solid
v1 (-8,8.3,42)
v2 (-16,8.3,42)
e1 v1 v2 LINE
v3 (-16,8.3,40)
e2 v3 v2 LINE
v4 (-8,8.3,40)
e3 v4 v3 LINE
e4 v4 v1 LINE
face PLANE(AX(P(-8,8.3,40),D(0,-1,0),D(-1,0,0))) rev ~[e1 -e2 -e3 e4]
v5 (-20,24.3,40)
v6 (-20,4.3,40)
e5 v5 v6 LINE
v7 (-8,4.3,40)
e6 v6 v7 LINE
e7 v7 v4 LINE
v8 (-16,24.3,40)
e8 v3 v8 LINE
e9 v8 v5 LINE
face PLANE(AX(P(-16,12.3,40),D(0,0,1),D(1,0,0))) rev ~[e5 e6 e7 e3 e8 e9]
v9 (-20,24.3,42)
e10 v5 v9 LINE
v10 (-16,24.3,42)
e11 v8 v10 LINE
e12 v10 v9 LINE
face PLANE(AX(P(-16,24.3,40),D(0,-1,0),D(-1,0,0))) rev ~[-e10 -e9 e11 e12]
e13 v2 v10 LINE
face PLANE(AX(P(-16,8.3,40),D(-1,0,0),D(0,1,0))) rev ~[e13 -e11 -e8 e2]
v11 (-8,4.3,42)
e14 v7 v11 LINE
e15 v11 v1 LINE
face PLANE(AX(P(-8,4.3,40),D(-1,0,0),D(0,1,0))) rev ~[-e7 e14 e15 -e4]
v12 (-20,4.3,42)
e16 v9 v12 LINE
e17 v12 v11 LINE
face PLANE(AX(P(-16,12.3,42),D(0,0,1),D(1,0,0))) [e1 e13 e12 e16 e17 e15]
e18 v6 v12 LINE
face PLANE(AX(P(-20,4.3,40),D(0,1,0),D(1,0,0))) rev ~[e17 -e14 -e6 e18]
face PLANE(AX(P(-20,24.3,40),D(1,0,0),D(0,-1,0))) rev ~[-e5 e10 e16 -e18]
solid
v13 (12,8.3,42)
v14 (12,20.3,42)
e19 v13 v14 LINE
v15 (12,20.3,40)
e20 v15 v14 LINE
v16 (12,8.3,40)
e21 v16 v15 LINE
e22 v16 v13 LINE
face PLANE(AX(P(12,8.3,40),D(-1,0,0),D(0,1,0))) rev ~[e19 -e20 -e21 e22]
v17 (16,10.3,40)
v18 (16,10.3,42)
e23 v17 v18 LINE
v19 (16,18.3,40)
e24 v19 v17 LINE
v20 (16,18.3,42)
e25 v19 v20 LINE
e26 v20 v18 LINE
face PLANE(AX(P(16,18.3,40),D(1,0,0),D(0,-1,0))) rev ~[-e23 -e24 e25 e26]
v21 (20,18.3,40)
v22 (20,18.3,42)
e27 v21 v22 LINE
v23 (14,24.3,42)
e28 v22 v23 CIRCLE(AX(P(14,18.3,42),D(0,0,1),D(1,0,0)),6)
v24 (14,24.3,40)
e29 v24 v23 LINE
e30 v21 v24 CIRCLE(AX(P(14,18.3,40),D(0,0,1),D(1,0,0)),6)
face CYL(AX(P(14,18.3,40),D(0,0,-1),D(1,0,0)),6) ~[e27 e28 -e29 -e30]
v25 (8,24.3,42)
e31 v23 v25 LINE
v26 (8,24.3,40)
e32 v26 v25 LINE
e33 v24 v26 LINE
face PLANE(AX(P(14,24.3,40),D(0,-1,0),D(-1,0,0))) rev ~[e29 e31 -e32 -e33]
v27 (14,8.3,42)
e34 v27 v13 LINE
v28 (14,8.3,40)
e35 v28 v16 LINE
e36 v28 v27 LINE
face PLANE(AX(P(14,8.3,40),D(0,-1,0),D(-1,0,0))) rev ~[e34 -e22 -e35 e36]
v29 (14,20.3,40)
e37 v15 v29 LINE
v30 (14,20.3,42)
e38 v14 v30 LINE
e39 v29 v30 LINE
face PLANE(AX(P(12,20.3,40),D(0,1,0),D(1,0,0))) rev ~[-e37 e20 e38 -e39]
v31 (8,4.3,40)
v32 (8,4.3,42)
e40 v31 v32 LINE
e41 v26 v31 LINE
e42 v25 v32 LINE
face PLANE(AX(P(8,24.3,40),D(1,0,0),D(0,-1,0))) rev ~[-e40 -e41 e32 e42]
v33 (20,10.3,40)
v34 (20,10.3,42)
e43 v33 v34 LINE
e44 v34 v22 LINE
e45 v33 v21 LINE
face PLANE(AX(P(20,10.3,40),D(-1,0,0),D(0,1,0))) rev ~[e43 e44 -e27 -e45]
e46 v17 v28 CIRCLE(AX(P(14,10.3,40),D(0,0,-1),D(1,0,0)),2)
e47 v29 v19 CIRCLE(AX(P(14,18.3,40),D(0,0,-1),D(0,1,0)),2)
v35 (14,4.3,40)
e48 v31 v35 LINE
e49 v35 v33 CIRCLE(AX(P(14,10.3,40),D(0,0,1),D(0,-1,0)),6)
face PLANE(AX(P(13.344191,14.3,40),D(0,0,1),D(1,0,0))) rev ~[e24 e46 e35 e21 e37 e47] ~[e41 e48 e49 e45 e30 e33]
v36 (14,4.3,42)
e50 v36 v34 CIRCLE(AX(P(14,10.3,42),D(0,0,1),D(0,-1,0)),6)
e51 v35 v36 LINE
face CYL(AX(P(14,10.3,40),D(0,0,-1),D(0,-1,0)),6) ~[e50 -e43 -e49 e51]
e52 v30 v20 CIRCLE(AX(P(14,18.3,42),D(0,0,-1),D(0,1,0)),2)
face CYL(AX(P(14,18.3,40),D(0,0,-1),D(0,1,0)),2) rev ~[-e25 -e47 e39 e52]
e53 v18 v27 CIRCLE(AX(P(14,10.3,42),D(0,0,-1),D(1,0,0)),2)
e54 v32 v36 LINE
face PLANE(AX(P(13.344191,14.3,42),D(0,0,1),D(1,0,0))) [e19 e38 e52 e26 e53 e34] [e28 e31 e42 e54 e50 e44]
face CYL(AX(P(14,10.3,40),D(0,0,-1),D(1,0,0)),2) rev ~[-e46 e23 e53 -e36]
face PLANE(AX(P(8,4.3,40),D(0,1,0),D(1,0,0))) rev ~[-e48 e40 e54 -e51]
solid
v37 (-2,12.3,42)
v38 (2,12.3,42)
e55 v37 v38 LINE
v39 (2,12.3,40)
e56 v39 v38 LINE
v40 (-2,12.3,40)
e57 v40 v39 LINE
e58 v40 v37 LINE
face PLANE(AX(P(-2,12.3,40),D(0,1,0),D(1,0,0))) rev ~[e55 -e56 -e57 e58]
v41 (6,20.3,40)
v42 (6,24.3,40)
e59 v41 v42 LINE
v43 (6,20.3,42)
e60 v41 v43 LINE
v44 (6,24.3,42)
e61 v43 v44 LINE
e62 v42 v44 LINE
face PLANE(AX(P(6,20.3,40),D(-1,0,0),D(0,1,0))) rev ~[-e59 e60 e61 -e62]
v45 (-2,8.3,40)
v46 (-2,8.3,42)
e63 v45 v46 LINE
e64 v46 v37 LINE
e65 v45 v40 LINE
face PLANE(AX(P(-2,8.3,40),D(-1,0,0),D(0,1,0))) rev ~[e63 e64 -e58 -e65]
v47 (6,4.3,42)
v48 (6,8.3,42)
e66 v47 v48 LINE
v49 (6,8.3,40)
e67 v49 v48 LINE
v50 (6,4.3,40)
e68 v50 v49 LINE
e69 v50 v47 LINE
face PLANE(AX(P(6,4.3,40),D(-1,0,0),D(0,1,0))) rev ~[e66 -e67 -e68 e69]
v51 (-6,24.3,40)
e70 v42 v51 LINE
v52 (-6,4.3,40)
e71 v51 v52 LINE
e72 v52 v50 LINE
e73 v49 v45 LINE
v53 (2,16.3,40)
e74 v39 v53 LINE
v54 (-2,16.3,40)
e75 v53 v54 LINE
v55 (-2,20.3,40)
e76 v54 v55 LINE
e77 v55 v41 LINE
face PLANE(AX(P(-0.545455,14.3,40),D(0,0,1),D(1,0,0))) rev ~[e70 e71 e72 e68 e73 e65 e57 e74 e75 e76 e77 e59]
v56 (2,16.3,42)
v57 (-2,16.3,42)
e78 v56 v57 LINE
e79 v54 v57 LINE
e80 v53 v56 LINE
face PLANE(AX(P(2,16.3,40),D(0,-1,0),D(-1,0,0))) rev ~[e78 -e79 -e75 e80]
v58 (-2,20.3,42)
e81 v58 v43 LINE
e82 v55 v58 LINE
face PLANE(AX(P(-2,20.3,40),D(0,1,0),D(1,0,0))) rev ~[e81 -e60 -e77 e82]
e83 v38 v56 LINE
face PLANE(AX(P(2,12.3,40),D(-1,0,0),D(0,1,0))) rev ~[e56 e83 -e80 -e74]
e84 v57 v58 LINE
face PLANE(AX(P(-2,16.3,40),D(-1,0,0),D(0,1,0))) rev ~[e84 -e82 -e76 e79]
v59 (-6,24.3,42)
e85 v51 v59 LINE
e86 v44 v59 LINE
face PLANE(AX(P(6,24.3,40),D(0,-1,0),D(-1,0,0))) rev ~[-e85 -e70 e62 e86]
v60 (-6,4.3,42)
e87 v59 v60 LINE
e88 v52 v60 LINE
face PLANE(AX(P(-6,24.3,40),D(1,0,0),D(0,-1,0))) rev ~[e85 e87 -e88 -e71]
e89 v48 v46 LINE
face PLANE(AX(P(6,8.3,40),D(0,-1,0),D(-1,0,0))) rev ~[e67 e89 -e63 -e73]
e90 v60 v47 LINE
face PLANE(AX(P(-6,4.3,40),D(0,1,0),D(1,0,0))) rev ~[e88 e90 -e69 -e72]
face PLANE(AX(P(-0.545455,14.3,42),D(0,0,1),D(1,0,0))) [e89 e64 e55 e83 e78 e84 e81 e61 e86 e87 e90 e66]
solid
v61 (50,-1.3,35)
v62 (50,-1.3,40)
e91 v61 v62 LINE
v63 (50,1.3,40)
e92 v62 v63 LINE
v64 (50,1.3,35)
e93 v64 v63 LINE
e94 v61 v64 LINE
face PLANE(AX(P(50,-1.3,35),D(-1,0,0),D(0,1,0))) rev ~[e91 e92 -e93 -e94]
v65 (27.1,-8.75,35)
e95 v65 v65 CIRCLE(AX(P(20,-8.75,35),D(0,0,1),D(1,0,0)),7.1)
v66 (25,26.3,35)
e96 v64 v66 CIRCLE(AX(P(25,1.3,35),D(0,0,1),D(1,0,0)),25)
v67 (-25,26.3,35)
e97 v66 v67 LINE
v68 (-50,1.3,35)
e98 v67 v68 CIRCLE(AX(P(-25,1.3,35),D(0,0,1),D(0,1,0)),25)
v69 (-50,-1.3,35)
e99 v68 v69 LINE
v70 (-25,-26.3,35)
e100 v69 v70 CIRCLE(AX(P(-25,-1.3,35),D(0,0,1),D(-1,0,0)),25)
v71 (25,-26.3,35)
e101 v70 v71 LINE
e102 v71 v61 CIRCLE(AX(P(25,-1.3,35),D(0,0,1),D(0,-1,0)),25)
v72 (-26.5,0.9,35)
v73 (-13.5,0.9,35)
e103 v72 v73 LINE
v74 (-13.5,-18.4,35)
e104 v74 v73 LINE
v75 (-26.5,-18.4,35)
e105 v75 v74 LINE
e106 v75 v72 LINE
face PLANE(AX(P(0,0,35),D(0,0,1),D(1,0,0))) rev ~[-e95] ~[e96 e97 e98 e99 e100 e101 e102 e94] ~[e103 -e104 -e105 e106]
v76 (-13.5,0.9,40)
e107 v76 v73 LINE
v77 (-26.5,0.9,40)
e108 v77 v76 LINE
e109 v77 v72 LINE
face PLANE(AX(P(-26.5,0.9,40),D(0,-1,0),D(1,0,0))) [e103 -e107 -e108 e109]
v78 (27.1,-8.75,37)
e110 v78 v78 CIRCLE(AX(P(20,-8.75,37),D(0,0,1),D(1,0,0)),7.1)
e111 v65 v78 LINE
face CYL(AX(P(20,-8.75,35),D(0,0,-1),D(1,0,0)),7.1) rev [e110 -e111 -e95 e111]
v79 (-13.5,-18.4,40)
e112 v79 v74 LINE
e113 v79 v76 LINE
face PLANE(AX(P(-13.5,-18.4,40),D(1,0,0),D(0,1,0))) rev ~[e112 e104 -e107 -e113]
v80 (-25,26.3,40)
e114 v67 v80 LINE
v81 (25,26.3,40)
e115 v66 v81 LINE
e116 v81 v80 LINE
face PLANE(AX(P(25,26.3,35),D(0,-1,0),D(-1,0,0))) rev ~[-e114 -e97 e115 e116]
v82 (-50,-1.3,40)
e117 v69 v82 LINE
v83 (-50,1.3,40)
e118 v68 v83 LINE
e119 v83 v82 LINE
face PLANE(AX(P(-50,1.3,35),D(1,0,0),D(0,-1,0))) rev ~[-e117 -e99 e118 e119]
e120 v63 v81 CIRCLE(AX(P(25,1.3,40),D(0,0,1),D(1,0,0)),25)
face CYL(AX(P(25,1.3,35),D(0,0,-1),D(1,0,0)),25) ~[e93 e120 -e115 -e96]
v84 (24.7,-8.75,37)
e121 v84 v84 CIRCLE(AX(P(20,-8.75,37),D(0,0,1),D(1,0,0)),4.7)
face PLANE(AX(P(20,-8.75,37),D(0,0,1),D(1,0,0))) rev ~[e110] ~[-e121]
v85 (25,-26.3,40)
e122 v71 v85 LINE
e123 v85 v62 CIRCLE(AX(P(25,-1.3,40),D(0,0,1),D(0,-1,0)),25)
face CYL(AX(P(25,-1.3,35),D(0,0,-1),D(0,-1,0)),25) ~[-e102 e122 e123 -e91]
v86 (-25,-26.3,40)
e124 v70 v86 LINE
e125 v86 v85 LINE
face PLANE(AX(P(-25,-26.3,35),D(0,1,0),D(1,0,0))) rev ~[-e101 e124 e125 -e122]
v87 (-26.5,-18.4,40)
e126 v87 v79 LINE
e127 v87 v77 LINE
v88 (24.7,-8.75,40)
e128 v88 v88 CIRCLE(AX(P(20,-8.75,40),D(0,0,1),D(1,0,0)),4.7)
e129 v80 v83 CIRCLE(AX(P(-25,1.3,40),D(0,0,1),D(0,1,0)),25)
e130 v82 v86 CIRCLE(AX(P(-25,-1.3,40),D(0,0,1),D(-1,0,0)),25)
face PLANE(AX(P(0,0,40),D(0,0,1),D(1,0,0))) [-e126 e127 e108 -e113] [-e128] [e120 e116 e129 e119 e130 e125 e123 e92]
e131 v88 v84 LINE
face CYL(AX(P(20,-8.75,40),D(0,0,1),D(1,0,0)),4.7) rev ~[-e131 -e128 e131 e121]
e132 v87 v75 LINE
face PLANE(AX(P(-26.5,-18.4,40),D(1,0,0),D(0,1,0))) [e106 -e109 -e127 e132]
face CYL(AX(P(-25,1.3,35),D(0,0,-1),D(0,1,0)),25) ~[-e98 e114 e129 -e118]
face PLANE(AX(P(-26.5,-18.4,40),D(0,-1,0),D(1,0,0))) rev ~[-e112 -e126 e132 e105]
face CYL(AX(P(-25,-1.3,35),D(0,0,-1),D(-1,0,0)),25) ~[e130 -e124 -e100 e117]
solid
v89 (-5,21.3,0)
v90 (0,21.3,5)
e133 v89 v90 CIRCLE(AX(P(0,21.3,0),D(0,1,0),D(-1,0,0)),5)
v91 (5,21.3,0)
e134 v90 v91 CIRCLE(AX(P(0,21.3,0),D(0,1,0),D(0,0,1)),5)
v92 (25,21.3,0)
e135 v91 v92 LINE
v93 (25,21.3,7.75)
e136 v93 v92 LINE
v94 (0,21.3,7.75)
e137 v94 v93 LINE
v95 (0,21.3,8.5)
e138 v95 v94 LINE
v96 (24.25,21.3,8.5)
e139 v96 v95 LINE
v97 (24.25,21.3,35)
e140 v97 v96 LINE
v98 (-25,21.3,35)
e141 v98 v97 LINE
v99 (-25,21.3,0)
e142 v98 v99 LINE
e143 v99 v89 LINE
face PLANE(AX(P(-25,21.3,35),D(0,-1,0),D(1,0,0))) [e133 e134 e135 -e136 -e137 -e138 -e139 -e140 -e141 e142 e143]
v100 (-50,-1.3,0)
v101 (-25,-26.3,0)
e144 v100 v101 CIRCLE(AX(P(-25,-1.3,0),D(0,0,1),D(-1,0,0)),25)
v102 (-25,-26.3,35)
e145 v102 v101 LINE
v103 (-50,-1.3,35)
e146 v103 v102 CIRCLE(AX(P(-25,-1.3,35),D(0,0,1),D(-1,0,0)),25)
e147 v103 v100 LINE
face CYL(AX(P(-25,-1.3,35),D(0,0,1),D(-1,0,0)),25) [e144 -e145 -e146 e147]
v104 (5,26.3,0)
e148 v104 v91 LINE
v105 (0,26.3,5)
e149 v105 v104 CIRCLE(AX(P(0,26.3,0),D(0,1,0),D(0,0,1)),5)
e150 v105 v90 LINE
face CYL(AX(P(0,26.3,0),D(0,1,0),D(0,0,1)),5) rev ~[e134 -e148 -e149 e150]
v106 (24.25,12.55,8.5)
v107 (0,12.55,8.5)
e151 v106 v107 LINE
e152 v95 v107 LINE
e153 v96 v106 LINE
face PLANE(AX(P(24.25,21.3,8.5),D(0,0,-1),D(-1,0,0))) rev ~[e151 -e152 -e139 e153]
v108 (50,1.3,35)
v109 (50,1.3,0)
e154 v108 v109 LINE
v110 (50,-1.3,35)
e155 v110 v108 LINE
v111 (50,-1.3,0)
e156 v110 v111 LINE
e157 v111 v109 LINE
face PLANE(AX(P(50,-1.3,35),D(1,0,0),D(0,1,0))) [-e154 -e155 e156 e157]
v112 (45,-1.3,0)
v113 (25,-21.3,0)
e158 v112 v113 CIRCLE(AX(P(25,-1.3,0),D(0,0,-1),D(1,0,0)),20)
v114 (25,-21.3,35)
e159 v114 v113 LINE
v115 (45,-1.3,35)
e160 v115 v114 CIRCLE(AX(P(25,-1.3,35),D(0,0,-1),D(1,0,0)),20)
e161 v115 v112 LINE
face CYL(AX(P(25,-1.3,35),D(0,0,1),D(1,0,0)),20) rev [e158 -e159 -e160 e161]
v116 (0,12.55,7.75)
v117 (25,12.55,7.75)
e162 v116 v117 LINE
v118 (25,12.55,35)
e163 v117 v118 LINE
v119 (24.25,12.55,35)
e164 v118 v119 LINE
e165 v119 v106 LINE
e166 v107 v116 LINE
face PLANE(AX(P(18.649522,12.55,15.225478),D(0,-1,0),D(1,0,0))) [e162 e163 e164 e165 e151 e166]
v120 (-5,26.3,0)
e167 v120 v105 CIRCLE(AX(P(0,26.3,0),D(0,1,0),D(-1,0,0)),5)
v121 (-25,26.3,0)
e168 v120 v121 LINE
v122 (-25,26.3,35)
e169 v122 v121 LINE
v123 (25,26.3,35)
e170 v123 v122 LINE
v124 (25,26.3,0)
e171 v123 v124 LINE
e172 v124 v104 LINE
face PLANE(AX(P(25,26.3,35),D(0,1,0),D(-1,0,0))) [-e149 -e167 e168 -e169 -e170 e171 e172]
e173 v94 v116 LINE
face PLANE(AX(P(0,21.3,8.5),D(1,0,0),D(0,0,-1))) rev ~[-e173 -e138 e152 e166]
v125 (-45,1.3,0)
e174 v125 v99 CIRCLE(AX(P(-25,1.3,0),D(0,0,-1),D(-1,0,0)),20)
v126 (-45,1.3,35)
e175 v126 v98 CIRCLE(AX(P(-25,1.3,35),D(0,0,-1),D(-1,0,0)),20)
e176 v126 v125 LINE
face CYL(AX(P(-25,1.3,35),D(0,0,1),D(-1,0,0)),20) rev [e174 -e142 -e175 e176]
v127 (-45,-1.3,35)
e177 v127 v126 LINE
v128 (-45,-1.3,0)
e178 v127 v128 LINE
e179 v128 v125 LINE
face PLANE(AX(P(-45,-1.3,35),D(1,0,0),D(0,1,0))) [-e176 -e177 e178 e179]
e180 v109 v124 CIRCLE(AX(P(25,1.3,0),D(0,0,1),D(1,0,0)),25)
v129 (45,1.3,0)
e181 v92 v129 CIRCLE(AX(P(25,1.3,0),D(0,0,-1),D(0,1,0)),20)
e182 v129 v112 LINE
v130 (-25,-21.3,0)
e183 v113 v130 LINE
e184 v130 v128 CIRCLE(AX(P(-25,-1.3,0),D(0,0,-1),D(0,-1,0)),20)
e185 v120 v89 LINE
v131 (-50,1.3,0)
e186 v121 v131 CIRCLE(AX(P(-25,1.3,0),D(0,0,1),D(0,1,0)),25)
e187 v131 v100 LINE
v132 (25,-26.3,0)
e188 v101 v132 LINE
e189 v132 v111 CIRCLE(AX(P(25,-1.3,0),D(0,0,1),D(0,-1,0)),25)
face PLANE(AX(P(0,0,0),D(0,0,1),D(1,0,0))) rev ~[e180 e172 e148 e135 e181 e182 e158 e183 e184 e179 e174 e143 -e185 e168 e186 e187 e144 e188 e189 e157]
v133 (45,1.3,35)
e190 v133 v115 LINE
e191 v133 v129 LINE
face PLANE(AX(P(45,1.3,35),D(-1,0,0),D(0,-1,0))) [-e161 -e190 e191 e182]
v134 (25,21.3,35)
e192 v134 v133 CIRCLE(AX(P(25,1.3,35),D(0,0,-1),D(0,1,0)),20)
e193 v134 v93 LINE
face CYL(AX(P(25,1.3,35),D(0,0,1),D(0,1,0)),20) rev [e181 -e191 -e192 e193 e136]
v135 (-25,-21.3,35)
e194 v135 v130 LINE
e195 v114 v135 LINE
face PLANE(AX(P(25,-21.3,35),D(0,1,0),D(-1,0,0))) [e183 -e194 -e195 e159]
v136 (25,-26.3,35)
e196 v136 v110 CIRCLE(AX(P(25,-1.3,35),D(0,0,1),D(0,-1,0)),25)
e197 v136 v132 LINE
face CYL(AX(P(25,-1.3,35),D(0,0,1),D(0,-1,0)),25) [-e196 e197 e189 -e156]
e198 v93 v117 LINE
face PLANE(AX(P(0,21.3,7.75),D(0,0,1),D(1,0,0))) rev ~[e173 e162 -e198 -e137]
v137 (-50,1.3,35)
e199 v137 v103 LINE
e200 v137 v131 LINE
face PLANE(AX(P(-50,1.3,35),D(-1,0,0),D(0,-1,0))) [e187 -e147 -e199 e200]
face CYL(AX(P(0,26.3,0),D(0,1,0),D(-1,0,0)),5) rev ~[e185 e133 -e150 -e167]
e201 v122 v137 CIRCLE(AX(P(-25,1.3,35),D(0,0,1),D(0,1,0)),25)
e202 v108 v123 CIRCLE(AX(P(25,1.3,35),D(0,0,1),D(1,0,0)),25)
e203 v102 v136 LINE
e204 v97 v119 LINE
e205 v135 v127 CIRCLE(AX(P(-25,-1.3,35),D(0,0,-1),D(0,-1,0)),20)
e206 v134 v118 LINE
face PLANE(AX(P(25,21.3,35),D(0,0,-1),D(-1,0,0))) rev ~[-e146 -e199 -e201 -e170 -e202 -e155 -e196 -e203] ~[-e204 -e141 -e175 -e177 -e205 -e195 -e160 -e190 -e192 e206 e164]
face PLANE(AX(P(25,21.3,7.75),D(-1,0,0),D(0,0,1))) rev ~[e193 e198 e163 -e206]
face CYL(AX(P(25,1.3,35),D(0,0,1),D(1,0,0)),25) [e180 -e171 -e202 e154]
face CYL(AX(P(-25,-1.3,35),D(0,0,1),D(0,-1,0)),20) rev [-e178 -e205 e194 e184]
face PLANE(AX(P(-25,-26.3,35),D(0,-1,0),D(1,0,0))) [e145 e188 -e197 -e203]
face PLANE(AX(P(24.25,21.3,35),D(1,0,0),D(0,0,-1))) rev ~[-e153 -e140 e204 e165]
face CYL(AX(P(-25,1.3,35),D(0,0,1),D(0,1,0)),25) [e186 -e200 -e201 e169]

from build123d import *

# Parameters (mm, degrees)
F2_DEPTH  = 5
F3_W      = 13
F3_H      = 19.3
F3_R      = 4.7
F4_DEPTH  = 5
F5_R      = 7.1
F6_DEPTH  = 2
F8_DEPTH  = 35
F10_DEPTH = 5
F12_DEPTH = 8.75
F14_DEPTH = 2


with BuildPart() as f2:
    # F1 (on offset) → F2 (new body)
    with BuildSketch(Plane.XY.offset(35)):
        with BuildLine():
            ThreePointArc((50, 1.3), (42.6776695297, 18.9776695297), (25, 26.3))
            Line((25, 26.3), (-25, 26.3))
            ThreePointArc((-25, 26.3), (-42.6776695297, 18.9776695297), (-50, 1.3))
            Line((-50, 1.3), (-50, -1.3))
            ThreePointArc((-50, -1.3), (-42.6776695297, -18.9776695297), (-25, -26.3))
            Line((-25, -26.3), (25, -26.3))
            ThreePointArc((25, -26.3), (42.6776695297, -18.9776695297), (50, -1.3))
            Line((50, -1.3), (50, 1.3))
        make_face()
    extrude(amount=F2_DEPTH)

    # F3 (on face) → F4 (cut, through all)
    with BuildSketch(Plane.XY.offset(40)):
        with Locations((-20, -8.75)):
            Rectangle(F3_W, F3_H)
        with Locations((20, -8.75)):
            Circle(F3_R)
    extrude(amount=-F4_DEPTH, mode=Mode.SUBTRACT)

    # F5 (on face) → F6 (cut)
    with BuildSketch(Plane.XY.offset(35)):
        with Locations((20, -8.75)):
            Circle(F5_R)
    extrude(amount=F6_DEPTH, mode=Mode.SUBTRACT)


with BuildPart() as f8:
    # F7 (on face) → F8 (new body)
    with BuildSketch(Plane.XY.offset(35)):
        with BuildLine():
            ThreePointArc((50, 1.3), (42.6776695297, 18.9776695297), (25, 26.3))
            Line((25, 26.3), (-25, 26.3))
            ThreePointArc((-25, 26.3), (-42.6776695297, 18.9776695297), (-50, 1.3))
            Line((-50, 1.3), (-50, -1.3))
            ThreePointArc((-50, -1.3), (-42.6776695297, -18.9776695297), (-25, -26.3))
            Line((-25, -26.3), (25, -26.3))
            ThreePointArc((25, -26.3), (42.6776695297, -18.9776695297), (50, -1.3))
            Line((50, -1.3), (50, 1.3))
        make_face()
        with BuildLine():
            Line((-25, 21.3), (25, 21.3))
            ThreePointArc((25, 21.3), (39.1421356237, 15.4421356237), (45, 1.3))
            Line((45, 1.3), (45, -1.3))
            ThreePointArc((45, -1.3), (39.1421356237, -15.4421356237), (25, -21.3))
            Line((25, -21.3), (-25, -21.3))
            ThreePointArc((-25, -21.3), (-39.1421356237, -15.4421356237), (-45, -1.3))
            Line((-45, -1.3), (-45, 1.3))
            ThreePointArc((-45, 1.3), (-39.1421356237, 15.4421356237), (-25, 21.3))
        make_face(mode=Mode.SUBTRACT)
    extrude(amount=-F8_DEPTH)

    # F9 (on face) → F10 (cut, through all)
    with BuildSketch(Plane(origin=(0, 26.3, 0), x_dir=(-1, 0, 0), z_dir=(0, 1, 0))):
        with BuildLine():
            ThreePointArc((0, 5), (-3.5355339059, 3.5355339059), (-5, 0))
            Line((-5, 0), (5, 0))
            ThreePointArc((5, 0), (3.5355339059, 3.5355339059), (0, 5))
        make_face()
    extrude(amount=-F10_DEPTH, mode=Mode.SUBTRACT)

    # F11 (on face) → F12 (join)
    with BuildSketch(Plane.XZ.offset(-21.3)):
        Polygon((25, 35), (24.25, 35), (24.25, 8.5), (0, 8.5), (0, 7.75), (25, 7.75), align=None)
    extrude(amount=F12_DEPTH)


with BuildPart() as f14:
    # F3 (on face) → F14 (new body)
    with BuildSketch(Plane.XY.offset(40)):
        Polygon((-16, 24.3), (-20, 24.3), (-20, 4.3), (-8, 4.3), (-8, 8.3), (-16, 8.3), align=None)
    extrude(amount=F14_DEPTH)


with BuildPart() as f14b:
    # F3 (on face) → F14, piece 2 (new body)
    with BuildSketch(Plane.XY.offset(40)):
        Polygon((6, 24.3), (-6, 24.3), (-6, 4.3), (6, 4.3), (6, 8.3), (-2, 8.3), (-2, 12.3), (2, 12.3), (2, 16.3), (-2, 16.3), (-2, 20.3), (6, 20.3), align=None)
    extrude(amount=F14_DEPTH)


with BuildPart() as f14c:
    # F3 (on face) → F14, piece 3 (new body)
    with BuildSketch(Plane.XY.offset(40)):
        with BuildLine():
            Line((12, 24.3), (8, 24.3))
            Line((8, 24.3), (8, 4.3))
            Line((8, 4.3), (12, 4.3))
            Line((12, 4.3), (14, 4.3))
            ThreePointArc((14, 4.3), (18.2426406871, 6.0573593129), (20, 10.3))
            Line((20, 10.3), (20, 18.3))
            ThreePointArc((20, 18.3), (18.2426406871, 22.5426406871), (14, 24.3))
            Line((14, 24.3), (12, 24.3))
        make_face()
        with BuildLine():
            Line((12, 8.3), (12, 20.3))
            Line((12, 20.3), (14, 20.3))
            ThreePointArc((14, 20.3), (15.4142135624, 19.7142135624), (16, 18.3))
            Line((16, 18.3), (16, 10.3))
            ThreePointArc((16, 10.3), (15.4142135624, 8.8857864376), (14, 8.3))
            Line((14, 8.3), (12, 8.3))
        make_face(mode=Mode.SUBTRACT)
    extrude(amount=F14_DEPTH)


solid = Compound([f2.part, f8.part, f14.part, f14b.part, f14c.part])
